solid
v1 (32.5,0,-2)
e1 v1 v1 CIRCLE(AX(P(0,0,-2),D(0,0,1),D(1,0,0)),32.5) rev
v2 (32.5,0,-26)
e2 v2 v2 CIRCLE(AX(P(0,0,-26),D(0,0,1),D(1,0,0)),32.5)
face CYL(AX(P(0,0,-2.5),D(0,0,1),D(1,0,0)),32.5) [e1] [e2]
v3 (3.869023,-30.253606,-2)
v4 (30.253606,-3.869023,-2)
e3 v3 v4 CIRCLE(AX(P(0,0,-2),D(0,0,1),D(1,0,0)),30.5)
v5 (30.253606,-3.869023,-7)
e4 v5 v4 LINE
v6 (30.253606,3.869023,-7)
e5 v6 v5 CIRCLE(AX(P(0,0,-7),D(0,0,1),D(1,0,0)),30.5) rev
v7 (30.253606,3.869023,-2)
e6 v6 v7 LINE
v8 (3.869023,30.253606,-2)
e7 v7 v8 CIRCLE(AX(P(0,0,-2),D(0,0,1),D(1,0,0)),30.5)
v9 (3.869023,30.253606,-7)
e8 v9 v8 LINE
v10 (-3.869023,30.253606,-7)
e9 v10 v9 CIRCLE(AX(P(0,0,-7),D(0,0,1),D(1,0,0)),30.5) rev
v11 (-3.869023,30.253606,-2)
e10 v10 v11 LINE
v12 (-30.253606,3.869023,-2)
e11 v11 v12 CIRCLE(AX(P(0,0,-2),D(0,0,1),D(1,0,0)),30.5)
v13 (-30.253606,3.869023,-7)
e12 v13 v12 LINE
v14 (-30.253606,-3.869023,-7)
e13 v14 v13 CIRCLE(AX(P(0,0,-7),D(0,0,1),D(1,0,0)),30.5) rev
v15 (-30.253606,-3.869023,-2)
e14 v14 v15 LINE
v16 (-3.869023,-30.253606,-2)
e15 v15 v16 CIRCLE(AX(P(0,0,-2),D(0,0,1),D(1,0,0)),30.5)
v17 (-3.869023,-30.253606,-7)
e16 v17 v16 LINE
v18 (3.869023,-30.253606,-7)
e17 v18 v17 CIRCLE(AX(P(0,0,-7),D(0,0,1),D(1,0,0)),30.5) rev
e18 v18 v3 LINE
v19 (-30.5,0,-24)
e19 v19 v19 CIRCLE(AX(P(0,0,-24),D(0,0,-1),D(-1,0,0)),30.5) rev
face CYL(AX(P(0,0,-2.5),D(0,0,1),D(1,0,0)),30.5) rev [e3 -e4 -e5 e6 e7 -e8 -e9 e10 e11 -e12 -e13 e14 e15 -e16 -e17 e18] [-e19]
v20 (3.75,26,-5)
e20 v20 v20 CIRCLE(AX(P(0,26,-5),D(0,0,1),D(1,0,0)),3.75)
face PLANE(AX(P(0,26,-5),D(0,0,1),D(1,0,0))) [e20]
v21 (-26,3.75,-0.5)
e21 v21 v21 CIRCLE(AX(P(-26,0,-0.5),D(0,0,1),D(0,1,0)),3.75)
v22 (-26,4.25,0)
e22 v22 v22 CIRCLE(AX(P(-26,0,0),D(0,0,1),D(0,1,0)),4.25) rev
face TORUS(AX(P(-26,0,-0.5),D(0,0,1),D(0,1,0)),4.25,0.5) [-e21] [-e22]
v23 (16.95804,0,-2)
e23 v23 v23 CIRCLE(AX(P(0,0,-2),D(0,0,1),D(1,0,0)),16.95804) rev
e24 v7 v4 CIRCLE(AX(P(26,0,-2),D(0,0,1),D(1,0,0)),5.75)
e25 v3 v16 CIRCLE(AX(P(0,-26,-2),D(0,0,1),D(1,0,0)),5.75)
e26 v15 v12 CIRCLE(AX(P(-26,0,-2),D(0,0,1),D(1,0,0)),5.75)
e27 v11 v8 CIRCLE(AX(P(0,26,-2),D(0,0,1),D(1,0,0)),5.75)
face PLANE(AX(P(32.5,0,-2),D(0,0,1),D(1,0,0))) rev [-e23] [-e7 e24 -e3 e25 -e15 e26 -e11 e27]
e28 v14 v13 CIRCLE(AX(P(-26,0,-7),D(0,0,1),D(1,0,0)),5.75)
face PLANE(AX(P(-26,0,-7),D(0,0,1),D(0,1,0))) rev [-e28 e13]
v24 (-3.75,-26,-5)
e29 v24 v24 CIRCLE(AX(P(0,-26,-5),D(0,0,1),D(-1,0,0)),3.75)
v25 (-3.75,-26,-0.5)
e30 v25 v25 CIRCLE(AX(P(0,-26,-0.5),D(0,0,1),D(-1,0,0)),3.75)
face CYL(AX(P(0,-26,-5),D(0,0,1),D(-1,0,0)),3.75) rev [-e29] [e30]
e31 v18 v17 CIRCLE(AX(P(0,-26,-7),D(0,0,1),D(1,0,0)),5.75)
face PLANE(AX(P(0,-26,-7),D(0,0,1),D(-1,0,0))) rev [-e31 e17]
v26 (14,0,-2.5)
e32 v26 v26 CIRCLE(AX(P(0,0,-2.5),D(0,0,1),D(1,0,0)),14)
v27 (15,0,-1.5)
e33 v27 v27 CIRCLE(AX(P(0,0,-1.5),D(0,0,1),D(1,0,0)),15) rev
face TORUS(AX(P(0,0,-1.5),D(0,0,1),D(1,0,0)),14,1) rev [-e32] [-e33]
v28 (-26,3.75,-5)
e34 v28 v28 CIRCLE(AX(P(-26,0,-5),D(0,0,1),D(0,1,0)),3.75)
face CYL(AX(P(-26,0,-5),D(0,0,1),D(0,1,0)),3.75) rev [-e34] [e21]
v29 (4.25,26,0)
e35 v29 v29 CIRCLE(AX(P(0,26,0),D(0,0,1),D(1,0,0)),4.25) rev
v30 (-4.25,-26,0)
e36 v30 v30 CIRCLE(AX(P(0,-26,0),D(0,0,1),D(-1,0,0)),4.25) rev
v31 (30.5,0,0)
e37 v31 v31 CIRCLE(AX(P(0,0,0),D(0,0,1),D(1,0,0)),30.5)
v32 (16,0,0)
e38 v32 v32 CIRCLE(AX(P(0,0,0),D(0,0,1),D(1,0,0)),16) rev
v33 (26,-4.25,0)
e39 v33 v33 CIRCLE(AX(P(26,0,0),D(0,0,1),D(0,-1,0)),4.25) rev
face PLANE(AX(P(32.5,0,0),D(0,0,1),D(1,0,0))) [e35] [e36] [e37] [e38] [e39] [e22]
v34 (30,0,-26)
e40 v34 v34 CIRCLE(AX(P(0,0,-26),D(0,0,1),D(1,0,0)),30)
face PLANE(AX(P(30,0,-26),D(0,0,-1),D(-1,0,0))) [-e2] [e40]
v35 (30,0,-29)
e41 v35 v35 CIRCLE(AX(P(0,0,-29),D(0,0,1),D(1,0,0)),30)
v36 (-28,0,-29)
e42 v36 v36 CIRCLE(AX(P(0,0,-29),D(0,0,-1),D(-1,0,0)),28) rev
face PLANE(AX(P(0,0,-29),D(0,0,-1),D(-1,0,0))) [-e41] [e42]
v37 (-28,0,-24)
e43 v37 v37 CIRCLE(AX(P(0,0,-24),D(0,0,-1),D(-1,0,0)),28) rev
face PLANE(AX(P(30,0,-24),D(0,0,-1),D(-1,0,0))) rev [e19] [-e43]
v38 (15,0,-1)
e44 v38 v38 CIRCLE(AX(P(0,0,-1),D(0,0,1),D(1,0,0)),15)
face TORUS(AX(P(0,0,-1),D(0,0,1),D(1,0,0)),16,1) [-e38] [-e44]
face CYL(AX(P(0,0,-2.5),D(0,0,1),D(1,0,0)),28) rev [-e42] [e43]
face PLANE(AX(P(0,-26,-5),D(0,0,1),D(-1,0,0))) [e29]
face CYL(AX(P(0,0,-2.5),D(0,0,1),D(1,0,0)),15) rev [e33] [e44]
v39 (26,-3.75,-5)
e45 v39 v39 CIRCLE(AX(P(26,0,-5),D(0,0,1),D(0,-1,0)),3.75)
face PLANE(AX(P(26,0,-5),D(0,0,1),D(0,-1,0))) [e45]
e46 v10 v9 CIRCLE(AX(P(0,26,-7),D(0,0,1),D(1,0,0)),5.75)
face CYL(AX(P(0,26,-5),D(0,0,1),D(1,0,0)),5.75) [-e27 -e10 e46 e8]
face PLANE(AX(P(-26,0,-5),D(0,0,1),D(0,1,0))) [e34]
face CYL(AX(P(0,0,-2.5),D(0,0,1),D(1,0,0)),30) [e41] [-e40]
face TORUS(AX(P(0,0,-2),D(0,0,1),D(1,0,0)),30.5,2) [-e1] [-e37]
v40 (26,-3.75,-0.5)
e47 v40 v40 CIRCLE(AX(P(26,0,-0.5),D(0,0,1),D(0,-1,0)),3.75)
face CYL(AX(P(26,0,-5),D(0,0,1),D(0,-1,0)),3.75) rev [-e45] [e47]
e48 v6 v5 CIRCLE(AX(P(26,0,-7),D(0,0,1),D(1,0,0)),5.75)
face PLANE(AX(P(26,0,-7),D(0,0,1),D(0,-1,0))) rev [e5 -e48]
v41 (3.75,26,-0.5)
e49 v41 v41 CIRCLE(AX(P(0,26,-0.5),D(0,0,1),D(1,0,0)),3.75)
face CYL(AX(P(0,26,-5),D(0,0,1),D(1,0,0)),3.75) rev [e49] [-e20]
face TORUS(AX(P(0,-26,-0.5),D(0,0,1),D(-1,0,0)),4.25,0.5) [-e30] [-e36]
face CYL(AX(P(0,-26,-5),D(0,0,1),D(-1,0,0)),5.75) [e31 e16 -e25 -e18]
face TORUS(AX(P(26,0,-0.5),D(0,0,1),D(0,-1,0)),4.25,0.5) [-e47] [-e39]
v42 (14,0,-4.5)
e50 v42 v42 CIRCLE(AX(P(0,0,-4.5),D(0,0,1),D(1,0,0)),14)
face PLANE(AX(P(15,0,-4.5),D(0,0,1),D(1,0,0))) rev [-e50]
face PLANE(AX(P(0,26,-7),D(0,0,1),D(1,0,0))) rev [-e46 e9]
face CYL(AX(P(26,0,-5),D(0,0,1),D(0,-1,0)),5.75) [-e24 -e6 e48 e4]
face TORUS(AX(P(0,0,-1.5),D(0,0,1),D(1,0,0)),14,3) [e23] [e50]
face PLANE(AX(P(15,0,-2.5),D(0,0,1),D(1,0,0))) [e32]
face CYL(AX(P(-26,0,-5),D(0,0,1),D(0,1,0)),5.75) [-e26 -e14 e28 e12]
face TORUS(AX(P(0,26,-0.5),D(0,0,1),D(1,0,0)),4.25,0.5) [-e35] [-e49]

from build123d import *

# Parameters (mm, degrees)
SKETCH2_R                = 3.75
CUT_EXTRUDE1_DEPTH       = 5
FILLET1_R                = 0.5
CIRPATTERN2_COUNT        = 4
FILLET1_OF_CIRPATTERN2_R = 0.5
FILLET2_R                = 1
FILLET3_R                = 2
SHELL1_START             = -29
SHELL1_OUTLINE_R         = 28
SHELL1_DEPTH             = 22
SHELL1_START_2           = -24
SHELL1_2_DEPTH           = 19.5
SHELL1_3_DEPTH           = 17
SHELL1_START_3           = -4.5
SHELL1_4_DEPTH           = 2.5
SHELL1_6_OUTLINE_R       = 16.958039892
SHELL1_6_DEPTH           = 2.5


with BuildPart() as part:
    # Sketch1 → Revolve1 (revolve)
    with BuildSketch(Plane(origin=(0, 0, 0), x_dir=(1, 0, 0), z_dir=(0, 1, 0))):
        Polygon((0, 29), (30, 29), (30, 26), (32.5, 26), (32.5, 0), (15, 0), (15, 2.5), (0, 2.5), align=None)
    revolve(axis=Axis((0, 0, -2.5), (0, 0, -1)))

    # Sketch2 → Cut-Extrude1 (cut)
    with BuildSketch(Plane.XY):
        with Locations((0, 26)):
            Circle(SKETCH2_R)
    cut_extrude1 = extrude(amount=-CUT_EXTRUDE1_DEPTH, mode=Mode.SUBTRACT)

    # Fillet1
    fillet1_edges = [part.edges().sort_by_distance(p)[0] for p in [
        (-3.75, 26, 0),
    ]]
    fillet(fillet1_edges, radius=FILLET1_R)

    # CirPattern2: Cut-Extrude1 ×4 about axis
    cirpattern2_axis = Axis((0, 0, 0), (0, 0, 1))
    for i in range(1, CIRPATTERN2_COUNT):
        add(cut_extrude1.rotate(cirpattern2_axis, i * 360 / CIRPATTERN2_COUNT), mode=Mode.SUBTRACT)

    # Fillet1 of CirPattern2
    fillet1_of_cirpattern2_edges = [part.edges().sort_by_distance(p)[0] for p in [
        (-26, -3.75, 0),
        (3.75, -26, 0),
        (26, 3.75, 0),
    ]]
    fillet(fillet1_of_cirpattern2_edges, radius=FILLET1_OF_CIRPATTERN2_R)

    # Fillet2
    fillet2_edges = [part.edges().sort_by_distance(p)[0] for p in [
        (-15, 0, -2.5),
        (-15, 0, 0),
    ]]
    fillet(fillet2_edges, radius=FILLET2_R)

    # Fillet3
    fillet3_edges = [part.edges().sort_by_distance(p)[0] for p in [
        (-32.5, 0, 0),
    ]]
    fillet(fillet3_edges, radius=FILLET3_R)

    # Shell1: read off the stored shape, not the designer's step
    # Shell1 outline → Shell1 (cut)
    with BuildSketch(Plane.XY.offset(SHELL1_START)):
        Circle(SHELL1_OUTLINE_R)
    extrude(amount=SHELL1_DEPTH, mode=Mode.SUBTRACT)

    # Shell1 2 outline → Shell1 2 (cut)
    with BuildSketch(Plane.XY.offset(SHELL1_START_2)):
        with BuildLine():
            ThreePointArc((30.253605769, 3.869022869), (21.566756826, 21.566756826), (3.869022869, 30.253605769))
            ThreePointArc((3.869022869, 30.253605769), (0, 20.25), (-3.869022869, 30.253605769))
            ThreePointArc((-3.869022869, 30.253605769), (-21.566756826, 21.566756826), (-30.253605769, 3.869022869))
            ThreePointArc((-30.253605769, 3.869022869), (-20.25, 0), (-30.253605769, -3.869022869))
            ThreePointArc((-30.253605769, -3.869022869), (-21.566756826, -21.566756826), (-3.869022869, -30.253605769))
            ThreePointArc((-3.869022869, -30.253605769), (0, -20.25), (3.869022869, -30.253605769))
            ThreePointArc((3.869022869, -30.253605769), (21.566756826, -21.566756826), (30.253605769, -3.869022869))
            ThreePointArc((30.253605769, -3.869022869), (20.25, 0), (30.253605769, 3.869022869))
        make_face()
    extrude(amount=SHELL1_2_DEPTH, mode=Mode.SUBTRACT)

    # Shell1 3 outline → Shell1 3 (cut)
    with BuildSketch(Plane.XY.offset(SHELL1_START_2)):
        with BuildLine():
            ThreePointArc((27.441105769, 5.566481309), (28, 0), (27.441105769, -5.566481309))
            ThreePointArc((27.441105769, -5.566481309), (28.971157378, -4.922877597), (30.253605769, -3.869022869))
            ThreePointArc((30.253605769, -3.869022869), (30.5, 0), (30.253605769, 3.869022869))
            ThreePointArc((30.253605769, 3.869022869), (28.971157378, 4.922877597), (27.441105769, 5.566481309))
        make_face()
        with BuildLine():
            ThreePointArc((-5.566481309, 27.441105769), (0, 28), (5.566481309, 27.441105769))
            ThreePointArc((5.566481309, 27.441105769), (4.922877597, 28.971157378), (3.869022869, 30.253605769))
            ThreePointArc((3.869022869, 30.253605769), (0, 30.5), (-3.869022869, 30.253605769))
            ThreePointArc((-3.869022869, 30.253605769), (-4.922877597, 28.971157378), (-5.566481309, 27.441105769))
        make_face()
        with BuildLine():
            ThreePointArc((3.869022869, -30.253605769), (4.922877597, -28.971157378), (5.566481309, -27.441105769))
            ThreePointArc((5.566481309, -27.441105769), (0, -28), (-5.566481309, -27.441105769))
            ThreePointArc((-5.566481309, -27.441105769), (-4.922877597, -28.971157378), (-3.869022869, -30.253605769))
            ThreePointArc((-3.869022869, -30.253605769), (0, -30.5), (3.869022869, -30.253605769))
        make_face()
        with BuildLine():
            ThreePointArc((-27.441105769, -5.566481309), (-28, 0), (-27.441105769, 5.566481309))
            ThreePointArc((-27.441105769, 5.566481309), (-28.971157378, 4.922877597), (-30.253605769, 3.869022869))
            ThreePointArc((-30.253605769, 3.869022869), (-30.5, 0), (-30.253605769, -3.869022869))
            ThreePointArc((-30.253605769, -3.869022869), (-28.971157378, -4.922877597), (-27.441105769, -5.566481309))
        make_face()
    extrude(amount=SHELL1_3_DEPTH, mode=Mode.SUBTRACT)

    # Shell1 4 outline → Shell1 4 (cut)
    with BuildSketch(Plane.XY.offset(SHELL1_START_3)):
        with BuildLine():
            ThreePointArc((5.566481309, 27.441105769), (19.798989873, 19.798989873), (27.441105769, 5.566481309))
            ThreePointArc((27.441105769, 5.566481309), (28.971157378, 4.922877597), (30.253605769, 3.869022869))
            ThreePointArc((30.253605769, 3.869022869), (21.566756826, 21.566756826), (3.869022869, 30.253605769))
            ThreePointArc((3.869022869, 30.253605769), (4.922877597, 28.971157378), (5.566481309, 27.441105769))
        make_face()
        with BuildLine():
            ThreePointArc((30.253605769, -3.869022869), (28.971157378, -4.922877597), (27.441105769, -5.566481309))
            ThreePointArc((27.441105769, -5.566481309), (19.798989873, -19.798989873), (5.566481309, -27.441105769))
            ThreePointArc((5.566481309, -27.441105769), (4.922877597, -28.971157378), (3.869022869, -30.253605769))
            ThreePointArc((3.869022869, -30.253605769), (21.566756826, -21.566756826), (30.253605769, -3.869022869))
        make_face()
        with BuildLine():
            ThreePointArc((-27.441105769, 5.566481309), (-19.798989873, 19.798989873), (-5.566481309, 27.441105769))
            ThreePointArc((-5.566481309, 27.441105769), (-4.922877597, 28.971157378), (-3.869022869, 30.253605769))
            ThreePointArc((-3.869022869, 30.253605769), (-21.566756826, 21.566756826), (-30.253605769, 3.869022869))
            ThreePointArc((-30.253605769, 3.869022869), (-28.971157378, 4.922877597), (-27.441105769, 5.566481309))
        make_face()
        with BuildLine():
            ThreePointArc((-3.869022869, -30.253605769), (-4.922877597, -28.971157378), (-5.566481309, -27.441105769))
            ThreePointArc((-5.566481309, -27.441105769), (-19.798989873, -19.798989873), (-27.441105769, -5.566481309))
            ThreePointArc((-27.441105769, -5.566481309), (-28.971157378, -4.922877597), (-30.253605769, -3.869022869))
            ThreePointArc((-30.253605769, -3.869022869), (-21.566756826, -21.566756826), (-3.869022869, -30.253605769))
        make_face()
    extrude(amount=SHELL1_4_DEPTH, mode=Mode.SUBTRACT)

    # Shell1 5 outline → Shell1 5 (revolve, cut)
    with BuildSketch(Plane.XZ):
        with BuildLine():
            ThreePointArc((16.958039892, -2), (15.936491673, -3.791287847), (14, -4.5))
            Line((14, -4.5), (16.958039892, -4.5))
            Line((16.958039892, -4.5), (16.958039892, -2))
        make_face()
    revolve(axis=Axis((0, 0, 0), (0, 0, 1)), mode=Mode.SUBTRACT)

    # Shell1 6 outline → Shell1 6 (cut)
    with BuildSketch(Plane.XY.offset(SHELL1_START_3)):
        with BuildLine():
            ThreePointArc((5.566481309, 27.441105769), (0, 20.25), (-5.566481309, 27.441105769))
            ThreePointArc((-5.566481309, 27.441105769), (-19.798989873, 19.798989873), (-27.441105769, 5.566481309))
            ThreePointArc((-27.441105769, 5.566481309), (-20.25, 0), (-27.441105769, -5.566481309))
            ThreePointArc((-27.441105769, -5.566481309), (-19.798989873, -19.798989873), (-5.566481309, -27.441105769))
            ThreePointArc((-5.566481309, -27.441105769), (0, -20.25), (5.566481309, -27.441105769))
            ThreePointArc((5.566481309, -27.441105769), (19.798989873, -19.798989873), (27.441105769, -5.566481309))
            ThreePointArc((27.441105769, -5.566481309), (20.25, 0), (27.441105769, 5.566481309))
            ThreePointArc((27.441105769, 5.566481309), (19.798989873, 19.798989873), (5.566481309, 27.441105769))
        make_face()
        Circle(SHELL1_6_OUTLINE_R, mode=Mode.SUBTRACT)
    extrude(amount=SHELL1_6_DEPTH, mode=Mode.SUBTRACT)


solid = part.part
